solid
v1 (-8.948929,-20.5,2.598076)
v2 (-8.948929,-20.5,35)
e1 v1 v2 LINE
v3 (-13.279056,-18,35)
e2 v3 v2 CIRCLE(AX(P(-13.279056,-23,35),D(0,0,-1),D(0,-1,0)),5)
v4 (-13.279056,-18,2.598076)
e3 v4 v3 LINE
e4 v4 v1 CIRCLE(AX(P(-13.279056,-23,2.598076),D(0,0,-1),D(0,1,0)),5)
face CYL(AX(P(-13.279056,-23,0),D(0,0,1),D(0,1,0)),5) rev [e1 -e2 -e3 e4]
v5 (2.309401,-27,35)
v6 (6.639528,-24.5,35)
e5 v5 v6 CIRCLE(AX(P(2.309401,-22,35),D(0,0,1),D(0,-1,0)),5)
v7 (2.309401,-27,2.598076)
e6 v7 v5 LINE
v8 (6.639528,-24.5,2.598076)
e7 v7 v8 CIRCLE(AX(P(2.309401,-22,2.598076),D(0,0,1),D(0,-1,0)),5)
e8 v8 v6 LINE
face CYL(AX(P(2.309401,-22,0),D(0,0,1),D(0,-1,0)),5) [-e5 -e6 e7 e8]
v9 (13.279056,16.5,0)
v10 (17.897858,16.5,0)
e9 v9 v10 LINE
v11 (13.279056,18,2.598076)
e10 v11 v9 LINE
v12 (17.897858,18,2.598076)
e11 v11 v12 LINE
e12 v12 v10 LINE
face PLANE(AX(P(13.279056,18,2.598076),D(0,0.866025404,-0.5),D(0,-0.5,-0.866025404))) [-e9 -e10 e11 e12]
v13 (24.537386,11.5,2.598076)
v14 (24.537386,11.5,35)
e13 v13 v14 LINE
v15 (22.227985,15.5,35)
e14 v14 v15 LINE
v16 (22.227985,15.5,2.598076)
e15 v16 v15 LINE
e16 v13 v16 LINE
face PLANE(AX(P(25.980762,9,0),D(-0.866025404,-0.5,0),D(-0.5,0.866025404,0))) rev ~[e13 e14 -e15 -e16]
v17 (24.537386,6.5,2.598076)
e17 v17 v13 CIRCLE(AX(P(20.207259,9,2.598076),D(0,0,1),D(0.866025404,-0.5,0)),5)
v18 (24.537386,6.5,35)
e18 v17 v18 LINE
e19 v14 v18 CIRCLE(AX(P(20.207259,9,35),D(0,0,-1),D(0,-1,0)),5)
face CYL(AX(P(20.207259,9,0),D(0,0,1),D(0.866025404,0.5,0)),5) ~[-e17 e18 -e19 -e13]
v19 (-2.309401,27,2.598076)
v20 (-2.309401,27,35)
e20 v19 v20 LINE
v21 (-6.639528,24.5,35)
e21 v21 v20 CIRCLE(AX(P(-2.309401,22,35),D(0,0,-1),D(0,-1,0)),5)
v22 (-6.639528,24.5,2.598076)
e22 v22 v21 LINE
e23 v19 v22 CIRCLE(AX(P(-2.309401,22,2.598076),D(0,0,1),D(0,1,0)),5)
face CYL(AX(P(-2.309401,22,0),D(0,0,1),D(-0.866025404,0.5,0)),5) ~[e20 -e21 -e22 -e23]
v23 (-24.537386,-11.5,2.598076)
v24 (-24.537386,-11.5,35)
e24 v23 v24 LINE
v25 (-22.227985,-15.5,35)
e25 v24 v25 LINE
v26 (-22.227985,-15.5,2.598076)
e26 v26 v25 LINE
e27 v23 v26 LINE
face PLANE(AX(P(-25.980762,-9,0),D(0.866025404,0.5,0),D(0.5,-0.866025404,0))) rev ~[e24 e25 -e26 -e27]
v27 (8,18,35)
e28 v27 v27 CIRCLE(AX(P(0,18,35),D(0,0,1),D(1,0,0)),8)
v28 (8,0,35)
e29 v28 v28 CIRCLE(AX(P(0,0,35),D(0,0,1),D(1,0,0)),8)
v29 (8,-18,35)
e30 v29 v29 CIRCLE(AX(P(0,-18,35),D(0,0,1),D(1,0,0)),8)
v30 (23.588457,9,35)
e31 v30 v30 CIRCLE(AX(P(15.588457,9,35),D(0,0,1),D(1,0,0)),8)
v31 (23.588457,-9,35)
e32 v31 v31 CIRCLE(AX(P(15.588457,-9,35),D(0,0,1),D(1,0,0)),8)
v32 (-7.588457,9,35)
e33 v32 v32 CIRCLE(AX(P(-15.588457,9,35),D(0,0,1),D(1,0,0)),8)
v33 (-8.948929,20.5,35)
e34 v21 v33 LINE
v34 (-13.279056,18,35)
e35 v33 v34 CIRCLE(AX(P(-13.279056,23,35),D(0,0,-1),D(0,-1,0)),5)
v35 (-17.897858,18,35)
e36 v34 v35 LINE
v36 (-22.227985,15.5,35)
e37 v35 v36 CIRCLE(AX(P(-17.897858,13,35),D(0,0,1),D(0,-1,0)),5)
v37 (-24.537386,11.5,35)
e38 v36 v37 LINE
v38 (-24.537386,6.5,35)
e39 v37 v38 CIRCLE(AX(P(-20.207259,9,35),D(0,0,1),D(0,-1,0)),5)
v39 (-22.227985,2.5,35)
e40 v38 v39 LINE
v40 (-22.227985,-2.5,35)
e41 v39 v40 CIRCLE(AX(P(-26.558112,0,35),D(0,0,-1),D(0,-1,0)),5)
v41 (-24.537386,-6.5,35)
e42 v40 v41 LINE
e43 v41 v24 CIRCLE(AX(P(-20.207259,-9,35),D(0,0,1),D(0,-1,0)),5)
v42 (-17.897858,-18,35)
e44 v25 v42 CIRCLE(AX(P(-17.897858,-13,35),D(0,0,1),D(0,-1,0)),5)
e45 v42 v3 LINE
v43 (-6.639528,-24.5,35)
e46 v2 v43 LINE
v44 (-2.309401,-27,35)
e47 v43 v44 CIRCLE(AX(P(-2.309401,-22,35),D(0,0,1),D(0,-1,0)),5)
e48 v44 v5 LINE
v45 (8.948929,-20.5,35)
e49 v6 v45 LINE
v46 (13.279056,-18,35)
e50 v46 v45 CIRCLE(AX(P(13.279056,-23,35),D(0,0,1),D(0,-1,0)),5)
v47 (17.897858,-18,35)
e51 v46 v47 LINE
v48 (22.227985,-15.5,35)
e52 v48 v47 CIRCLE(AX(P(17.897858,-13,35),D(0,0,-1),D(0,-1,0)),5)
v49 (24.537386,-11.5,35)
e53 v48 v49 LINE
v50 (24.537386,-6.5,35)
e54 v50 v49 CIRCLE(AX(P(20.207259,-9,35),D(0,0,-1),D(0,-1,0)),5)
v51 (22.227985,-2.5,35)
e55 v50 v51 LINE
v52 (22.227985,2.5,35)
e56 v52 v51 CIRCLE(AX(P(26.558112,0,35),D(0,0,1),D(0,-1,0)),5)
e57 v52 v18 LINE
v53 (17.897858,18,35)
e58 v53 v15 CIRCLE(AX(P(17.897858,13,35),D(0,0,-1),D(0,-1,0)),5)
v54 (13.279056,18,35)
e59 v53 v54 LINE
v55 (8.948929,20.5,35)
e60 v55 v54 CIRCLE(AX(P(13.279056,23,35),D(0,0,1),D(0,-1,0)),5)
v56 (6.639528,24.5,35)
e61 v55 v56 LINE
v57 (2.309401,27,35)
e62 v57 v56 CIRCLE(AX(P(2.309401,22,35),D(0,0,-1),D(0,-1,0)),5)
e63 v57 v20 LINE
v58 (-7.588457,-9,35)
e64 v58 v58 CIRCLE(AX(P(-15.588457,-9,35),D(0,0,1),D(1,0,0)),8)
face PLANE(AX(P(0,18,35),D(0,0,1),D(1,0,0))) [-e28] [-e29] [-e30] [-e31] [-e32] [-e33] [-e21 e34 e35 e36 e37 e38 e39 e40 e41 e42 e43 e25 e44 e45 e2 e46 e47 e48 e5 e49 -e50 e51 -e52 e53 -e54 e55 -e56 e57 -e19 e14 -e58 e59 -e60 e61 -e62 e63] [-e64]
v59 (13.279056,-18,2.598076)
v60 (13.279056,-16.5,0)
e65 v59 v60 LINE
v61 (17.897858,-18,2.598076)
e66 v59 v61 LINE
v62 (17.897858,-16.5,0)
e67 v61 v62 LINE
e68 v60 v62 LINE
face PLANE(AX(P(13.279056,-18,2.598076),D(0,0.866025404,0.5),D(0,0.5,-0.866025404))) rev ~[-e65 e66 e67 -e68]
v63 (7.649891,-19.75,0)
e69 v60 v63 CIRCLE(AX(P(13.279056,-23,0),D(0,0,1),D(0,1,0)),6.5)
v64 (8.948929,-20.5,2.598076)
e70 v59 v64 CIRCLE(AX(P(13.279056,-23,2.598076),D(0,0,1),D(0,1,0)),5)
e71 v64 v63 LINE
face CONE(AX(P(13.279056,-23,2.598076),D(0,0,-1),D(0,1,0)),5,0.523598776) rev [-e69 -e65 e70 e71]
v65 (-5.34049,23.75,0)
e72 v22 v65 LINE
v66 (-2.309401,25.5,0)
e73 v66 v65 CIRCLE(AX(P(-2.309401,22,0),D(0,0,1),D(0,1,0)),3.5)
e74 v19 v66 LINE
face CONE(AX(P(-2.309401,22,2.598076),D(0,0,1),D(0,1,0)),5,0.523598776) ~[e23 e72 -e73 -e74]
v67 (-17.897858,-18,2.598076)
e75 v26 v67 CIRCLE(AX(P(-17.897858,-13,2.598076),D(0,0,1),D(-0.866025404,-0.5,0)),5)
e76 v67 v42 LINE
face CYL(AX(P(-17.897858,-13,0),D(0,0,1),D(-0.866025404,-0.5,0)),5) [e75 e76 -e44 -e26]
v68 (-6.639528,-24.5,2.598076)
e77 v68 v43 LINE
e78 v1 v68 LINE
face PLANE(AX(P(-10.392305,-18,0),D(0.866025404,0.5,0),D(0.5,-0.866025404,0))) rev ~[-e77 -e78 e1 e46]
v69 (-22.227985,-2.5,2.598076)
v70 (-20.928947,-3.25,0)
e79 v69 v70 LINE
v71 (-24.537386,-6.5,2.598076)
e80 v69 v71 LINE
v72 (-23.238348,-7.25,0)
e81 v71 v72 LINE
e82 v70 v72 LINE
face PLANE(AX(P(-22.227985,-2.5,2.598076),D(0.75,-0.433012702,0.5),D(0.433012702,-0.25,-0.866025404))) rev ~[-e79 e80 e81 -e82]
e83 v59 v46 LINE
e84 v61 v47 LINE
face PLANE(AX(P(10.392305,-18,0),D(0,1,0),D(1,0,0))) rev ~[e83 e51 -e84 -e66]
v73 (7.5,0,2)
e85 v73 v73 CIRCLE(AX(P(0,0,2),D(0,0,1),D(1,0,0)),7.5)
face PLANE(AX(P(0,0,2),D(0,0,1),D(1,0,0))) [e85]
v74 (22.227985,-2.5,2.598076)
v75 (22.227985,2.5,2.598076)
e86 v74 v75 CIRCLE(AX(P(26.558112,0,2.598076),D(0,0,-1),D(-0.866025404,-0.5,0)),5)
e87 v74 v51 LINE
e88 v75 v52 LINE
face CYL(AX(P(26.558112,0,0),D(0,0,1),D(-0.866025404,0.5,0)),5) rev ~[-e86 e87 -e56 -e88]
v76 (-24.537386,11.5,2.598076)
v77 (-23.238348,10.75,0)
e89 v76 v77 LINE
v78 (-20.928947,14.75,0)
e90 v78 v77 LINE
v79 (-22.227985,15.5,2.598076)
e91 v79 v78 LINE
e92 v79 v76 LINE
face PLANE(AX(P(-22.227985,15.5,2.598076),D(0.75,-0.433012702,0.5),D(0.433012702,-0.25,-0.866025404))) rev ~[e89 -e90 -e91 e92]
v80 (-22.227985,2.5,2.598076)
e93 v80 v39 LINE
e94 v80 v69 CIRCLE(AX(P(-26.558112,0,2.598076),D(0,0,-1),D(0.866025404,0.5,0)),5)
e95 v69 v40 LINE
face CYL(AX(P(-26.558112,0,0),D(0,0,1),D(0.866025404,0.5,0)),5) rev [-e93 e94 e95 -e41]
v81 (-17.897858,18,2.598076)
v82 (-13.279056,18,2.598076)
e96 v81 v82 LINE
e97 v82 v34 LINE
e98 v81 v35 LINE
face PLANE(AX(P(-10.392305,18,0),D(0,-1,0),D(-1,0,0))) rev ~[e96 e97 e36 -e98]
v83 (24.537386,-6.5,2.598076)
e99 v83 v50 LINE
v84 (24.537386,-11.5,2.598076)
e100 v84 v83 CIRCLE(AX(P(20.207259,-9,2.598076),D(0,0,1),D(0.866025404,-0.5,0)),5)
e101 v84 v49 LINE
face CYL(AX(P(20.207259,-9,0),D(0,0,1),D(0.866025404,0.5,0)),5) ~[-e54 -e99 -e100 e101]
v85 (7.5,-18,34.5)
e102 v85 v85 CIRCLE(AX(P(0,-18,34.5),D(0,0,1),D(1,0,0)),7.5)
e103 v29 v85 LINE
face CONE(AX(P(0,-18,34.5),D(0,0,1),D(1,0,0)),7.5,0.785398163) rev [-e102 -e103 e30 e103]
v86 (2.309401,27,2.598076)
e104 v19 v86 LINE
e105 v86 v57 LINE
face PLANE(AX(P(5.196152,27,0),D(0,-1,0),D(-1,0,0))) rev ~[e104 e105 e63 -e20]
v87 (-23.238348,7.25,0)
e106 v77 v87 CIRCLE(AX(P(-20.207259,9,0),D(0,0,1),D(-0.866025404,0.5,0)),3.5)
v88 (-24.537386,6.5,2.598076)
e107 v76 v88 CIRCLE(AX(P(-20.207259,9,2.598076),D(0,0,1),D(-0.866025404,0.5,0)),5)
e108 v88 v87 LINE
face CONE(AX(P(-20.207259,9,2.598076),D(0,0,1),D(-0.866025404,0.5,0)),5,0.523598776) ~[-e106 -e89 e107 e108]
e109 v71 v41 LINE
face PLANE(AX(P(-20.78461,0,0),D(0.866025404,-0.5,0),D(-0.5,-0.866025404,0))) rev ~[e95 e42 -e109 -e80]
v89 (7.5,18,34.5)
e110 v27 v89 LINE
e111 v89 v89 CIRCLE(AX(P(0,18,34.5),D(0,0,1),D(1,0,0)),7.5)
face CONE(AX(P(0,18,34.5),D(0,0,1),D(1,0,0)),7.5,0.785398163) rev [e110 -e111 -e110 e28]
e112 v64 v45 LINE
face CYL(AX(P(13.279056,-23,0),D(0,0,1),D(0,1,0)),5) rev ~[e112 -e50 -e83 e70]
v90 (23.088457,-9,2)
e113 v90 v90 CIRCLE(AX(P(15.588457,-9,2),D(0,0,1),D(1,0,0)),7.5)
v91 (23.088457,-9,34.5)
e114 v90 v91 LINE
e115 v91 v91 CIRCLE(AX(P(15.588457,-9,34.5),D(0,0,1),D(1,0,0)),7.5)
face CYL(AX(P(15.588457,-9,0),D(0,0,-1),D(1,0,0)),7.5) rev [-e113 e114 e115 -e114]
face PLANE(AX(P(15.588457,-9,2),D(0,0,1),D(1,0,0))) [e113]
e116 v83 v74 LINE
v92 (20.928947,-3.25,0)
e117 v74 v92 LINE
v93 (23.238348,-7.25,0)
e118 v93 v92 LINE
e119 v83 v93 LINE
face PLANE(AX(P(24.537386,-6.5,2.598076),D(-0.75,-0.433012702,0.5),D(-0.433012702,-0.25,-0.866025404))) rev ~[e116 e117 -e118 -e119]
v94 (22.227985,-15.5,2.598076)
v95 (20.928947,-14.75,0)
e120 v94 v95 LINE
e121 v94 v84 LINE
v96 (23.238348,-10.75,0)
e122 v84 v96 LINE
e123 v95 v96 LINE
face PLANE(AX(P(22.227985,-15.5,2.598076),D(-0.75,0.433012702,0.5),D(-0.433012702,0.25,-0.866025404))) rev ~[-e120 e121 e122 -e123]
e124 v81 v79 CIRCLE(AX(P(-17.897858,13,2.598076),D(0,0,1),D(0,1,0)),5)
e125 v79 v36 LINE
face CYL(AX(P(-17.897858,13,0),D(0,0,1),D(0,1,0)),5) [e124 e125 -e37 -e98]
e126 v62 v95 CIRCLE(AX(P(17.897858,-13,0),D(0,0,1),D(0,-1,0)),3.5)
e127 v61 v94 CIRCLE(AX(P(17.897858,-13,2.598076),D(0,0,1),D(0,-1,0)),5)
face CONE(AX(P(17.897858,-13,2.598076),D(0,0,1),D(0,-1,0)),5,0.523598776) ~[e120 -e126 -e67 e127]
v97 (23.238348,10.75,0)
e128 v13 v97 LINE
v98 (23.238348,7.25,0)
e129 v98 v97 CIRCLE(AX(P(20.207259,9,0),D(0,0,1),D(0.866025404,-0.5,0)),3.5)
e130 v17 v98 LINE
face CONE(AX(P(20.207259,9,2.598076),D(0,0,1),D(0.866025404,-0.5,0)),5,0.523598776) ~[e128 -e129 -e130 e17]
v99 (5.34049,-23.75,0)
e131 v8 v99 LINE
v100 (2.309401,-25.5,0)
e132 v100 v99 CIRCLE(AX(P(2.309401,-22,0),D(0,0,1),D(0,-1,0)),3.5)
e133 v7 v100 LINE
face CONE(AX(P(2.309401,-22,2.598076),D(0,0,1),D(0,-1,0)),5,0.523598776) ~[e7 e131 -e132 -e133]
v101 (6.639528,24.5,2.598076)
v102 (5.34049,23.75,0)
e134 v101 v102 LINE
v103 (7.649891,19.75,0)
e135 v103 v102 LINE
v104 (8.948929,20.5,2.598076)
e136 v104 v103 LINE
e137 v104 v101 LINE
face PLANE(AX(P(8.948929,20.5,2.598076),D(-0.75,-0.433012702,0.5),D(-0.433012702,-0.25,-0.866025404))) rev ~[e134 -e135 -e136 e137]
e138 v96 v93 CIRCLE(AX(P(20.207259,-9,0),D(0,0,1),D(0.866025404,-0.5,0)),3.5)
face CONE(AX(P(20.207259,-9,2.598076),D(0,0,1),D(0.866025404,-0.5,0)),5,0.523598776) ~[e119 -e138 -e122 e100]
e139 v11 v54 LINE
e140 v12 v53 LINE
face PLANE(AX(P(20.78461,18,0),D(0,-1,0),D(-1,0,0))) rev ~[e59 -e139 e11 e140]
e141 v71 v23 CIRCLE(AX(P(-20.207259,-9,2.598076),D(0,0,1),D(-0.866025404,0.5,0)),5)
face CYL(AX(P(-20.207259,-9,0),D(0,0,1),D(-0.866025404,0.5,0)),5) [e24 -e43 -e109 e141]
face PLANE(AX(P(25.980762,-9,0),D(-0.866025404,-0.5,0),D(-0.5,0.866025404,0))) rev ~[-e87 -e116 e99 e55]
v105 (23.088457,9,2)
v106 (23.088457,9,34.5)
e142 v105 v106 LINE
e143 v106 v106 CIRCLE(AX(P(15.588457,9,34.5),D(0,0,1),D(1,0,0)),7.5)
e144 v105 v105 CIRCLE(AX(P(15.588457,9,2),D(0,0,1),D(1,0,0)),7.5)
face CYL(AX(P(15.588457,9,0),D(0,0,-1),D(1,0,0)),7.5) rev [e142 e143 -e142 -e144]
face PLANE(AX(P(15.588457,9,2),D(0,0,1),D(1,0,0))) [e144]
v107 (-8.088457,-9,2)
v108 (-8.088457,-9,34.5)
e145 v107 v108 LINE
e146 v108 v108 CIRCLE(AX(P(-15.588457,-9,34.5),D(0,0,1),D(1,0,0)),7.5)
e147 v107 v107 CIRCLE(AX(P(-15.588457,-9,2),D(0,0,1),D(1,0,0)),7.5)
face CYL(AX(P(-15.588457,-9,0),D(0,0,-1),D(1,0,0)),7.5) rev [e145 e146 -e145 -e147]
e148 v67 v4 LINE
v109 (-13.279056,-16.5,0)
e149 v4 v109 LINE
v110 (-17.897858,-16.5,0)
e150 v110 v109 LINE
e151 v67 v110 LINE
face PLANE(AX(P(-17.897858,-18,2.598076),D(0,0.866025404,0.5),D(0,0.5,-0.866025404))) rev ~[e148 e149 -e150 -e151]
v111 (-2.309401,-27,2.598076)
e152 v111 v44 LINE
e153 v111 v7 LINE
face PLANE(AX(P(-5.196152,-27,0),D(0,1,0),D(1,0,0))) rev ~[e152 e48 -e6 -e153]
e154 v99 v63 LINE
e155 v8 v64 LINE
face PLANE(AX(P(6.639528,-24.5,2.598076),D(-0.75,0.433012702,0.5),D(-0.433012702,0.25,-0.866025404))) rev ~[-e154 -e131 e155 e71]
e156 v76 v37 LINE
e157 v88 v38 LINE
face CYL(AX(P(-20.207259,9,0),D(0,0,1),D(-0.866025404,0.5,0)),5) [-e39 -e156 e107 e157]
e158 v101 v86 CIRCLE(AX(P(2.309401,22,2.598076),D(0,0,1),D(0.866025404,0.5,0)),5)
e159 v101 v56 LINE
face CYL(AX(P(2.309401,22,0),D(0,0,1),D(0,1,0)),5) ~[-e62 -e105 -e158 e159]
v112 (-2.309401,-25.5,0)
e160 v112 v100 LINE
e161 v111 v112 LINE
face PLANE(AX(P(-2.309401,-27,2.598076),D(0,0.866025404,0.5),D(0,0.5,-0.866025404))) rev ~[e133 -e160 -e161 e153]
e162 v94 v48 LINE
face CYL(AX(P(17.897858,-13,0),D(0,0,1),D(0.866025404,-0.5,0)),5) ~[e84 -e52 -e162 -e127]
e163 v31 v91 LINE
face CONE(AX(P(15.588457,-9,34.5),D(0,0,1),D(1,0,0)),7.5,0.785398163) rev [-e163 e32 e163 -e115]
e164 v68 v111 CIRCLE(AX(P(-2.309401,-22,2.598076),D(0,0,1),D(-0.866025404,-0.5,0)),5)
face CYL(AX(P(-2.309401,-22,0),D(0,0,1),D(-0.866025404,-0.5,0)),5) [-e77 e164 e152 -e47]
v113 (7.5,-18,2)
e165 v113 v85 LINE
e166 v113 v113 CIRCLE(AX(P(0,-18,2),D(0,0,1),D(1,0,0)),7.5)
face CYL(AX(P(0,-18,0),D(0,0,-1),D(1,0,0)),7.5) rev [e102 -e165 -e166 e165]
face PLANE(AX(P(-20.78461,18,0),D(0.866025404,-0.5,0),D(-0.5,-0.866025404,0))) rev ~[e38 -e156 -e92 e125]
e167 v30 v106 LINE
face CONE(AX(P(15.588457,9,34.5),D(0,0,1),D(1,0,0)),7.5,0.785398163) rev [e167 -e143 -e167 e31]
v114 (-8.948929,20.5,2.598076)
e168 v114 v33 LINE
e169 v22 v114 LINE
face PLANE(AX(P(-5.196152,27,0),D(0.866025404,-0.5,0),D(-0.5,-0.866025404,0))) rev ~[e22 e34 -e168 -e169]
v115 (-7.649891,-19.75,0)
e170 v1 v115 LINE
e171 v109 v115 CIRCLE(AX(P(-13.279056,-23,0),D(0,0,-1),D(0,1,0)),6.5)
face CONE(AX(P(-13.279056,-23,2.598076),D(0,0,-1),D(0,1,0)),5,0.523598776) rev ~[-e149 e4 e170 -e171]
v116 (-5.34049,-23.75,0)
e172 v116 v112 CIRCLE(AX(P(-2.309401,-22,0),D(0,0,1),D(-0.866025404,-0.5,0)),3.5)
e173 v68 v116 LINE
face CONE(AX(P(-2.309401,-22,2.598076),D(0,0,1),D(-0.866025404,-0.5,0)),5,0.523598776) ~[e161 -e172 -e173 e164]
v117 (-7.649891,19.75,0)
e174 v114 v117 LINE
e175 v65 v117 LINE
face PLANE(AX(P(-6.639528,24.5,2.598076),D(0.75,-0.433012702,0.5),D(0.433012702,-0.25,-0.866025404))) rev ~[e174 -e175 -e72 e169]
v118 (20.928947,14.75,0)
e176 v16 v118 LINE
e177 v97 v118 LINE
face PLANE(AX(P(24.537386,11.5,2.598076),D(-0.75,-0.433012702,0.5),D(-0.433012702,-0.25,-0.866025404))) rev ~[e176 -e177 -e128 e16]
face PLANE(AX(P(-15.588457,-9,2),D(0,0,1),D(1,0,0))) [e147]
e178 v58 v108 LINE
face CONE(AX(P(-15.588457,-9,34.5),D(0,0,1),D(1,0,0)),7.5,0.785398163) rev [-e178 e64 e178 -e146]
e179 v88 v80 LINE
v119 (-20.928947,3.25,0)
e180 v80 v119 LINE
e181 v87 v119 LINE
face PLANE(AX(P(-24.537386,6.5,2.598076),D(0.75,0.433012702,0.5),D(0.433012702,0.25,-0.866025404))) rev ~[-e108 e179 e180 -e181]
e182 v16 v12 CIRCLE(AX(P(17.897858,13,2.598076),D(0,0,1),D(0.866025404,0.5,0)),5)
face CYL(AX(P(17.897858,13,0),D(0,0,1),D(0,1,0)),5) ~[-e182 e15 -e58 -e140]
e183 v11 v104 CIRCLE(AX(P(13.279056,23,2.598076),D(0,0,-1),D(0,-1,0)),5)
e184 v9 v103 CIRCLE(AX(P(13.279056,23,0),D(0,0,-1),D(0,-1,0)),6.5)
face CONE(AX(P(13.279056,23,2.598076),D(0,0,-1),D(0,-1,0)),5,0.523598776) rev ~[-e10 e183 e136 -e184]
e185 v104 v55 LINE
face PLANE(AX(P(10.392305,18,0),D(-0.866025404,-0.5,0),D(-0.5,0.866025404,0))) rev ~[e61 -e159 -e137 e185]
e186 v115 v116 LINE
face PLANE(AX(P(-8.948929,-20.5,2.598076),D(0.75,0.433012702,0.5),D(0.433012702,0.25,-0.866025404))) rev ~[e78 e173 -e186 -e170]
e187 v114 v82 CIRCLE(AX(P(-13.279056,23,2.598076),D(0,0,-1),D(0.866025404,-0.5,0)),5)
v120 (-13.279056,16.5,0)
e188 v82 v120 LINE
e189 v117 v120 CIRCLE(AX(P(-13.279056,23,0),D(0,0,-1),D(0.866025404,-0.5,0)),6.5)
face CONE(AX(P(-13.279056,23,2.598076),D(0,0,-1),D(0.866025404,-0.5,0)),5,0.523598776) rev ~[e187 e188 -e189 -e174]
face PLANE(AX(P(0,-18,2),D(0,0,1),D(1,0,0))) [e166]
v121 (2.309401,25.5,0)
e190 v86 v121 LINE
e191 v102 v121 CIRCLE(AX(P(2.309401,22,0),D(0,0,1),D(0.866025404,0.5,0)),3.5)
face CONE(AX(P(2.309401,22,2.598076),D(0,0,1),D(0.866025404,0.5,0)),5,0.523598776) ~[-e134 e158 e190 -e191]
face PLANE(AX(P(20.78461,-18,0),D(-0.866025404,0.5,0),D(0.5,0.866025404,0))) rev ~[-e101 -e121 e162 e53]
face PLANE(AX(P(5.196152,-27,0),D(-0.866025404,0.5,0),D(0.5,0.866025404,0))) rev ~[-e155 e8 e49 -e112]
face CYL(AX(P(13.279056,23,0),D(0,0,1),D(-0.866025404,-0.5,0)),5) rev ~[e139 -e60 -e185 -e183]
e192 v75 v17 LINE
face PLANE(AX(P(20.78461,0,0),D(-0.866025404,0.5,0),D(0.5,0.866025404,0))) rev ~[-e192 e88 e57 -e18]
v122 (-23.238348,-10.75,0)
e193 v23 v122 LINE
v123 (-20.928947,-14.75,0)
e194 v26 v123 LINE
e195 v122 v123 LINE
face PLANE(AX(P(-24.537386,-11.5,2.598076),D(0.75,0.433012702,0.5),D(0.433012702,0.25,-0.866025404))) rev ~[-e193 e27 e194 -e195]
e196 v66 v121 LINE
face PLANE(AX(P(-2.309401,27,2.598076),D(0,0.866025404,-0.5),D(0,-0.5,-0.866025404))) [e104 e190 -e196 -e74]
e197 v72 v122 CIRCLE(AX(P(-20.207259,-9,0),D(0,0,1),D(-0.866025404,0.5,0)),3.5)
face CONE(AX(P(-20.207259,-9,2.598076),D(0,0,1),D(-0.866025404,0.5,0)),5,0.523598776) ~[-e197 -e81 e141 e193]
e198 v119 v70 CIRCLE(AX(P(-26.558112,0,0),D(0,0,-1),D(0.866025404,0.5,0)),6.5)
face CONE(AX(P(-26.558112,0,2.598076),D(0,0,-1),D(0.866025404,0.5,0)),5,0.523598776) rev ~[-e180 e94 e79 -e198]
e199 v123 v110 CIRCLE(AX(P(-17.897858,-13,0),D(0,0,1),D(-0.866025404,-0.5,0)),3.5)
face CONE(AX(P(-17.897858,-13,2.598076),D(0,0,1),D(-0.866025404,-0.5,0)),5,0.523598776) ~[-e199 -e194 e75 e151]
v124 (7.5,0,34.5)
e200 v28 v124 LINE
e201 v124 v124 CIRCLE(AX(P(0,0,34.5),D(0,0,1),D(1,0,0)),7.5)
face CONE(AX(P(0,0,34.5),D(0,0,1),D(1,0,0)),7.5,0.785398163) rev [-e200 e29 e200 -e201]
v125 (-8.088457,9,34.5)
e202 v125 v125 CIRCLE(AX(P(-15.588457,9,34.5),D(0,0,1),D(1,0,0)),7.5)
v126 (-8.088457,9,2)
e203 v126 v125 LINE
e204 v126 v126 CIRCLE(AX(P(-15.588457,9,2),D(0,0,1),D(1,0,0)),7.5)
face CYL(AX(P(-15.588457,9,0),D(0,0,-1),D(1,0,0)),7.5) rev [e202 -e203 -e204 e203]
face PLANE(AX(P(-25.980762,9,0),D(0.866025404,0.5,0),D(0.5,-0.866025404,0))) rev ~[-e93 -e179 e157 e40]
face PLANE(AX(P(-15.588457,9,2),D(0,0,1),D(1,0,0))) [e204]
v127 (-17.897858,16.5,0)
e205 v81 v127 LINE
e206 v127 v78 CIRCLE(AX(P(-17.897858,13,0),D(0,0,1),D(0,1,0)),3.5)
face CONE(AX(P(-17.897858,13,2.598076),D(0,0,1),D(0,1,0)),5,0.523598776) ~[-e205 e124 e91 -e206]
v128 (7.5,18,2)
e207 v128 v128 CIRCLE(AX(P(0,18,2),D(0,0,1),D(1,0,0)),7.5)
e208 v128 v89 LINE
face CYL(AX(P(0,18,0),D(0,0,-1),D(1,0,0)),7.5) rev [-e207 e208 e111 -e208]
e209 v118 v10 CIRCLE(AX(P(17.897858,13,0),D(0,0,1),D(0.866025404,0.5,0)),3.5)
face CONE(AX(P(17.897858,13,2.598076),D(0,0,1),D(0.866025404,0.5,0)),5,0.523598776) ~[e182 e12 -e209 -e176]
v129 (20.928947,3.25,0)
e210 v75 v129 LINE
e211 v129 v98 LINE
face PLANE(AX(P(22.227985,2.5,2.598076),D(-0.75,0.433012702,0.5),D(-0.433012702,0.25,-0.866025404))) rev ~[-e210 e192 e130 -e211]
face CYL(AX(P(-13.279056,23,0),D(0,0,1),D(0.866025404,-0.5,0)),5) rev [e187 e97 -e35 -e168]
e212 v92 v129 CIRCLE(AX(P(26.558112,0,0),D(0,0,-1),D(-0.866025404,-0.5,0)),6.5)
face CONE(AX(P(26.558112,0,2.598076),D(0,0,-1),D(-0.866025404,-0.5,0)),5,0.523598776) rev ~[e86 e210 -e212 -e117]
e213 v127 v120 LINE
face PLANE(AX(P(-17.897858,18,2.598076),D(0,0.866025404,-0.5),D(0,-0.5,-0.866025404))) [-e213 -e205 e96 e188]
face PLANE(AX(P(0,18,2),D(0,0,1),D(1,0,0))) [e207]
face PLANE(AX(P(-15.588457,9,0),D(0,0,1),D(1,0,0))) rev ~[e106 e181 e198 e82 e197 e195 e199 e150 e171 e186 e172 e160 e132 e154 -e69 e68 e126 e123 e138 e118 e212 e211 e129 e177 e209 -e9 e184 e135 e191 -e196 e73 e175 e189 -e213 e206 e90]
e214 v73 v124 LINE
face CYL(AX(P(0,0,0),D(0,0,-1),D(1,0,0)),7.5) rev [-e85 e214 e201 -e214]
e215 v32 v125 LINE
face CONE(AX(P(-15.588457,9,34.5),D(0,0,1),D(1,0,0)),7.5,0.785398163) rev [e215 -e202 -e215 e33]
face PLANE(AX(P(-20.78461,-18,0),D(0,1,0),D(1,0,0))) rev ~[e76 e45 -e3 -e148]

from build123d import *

# Parameters (mm, degrees)
F0_R         = 7.5
F1_DEPTH     = 35
F2_DEPTH     = 2
F3_SIZE      = 0.5
F4_R         = 5
F5_T1_DEPTH  = 4.6188021535
F5_T3_DEPTH  = 4.6188021535
F5_T5_DEPTH  = 4.6188021535
F5_T7_DEPTH  = 4.6188021535
F5_T9_DEPTH  = 4.6188021535
F5_T11_DEPTH = 4.6188021535
F5_T13_DEPTH = 4.6188021535
F5_T15_DEPTH = 4.6188021535
F5_T17_DEPTH = 4.6188021535
F5_T19_DEPTH = 4.6188021535
F5_T21_DEPTH = 4.6188021535
F5_T23_DEPTH = 4.6188021535
F5_T25_DEPTH = 4.6188021535
F5_T27_DEPTH = 4.6188021535
F5_T29_DEPTH = 4.6188021535
F5_T32_ANGLE = 60
F5_T34_ANGLE = 60
F5_T36_ANGLE = 60
F5_T38_ANGLE = 60
F5_T40_ANGLE = 60
F5_T42_ANGLE = 60
F5_T44_ANGLE = 60
F5_T46_ANGLE = 60
F5_T48_ANGLE = 60
F5_T50_ANGLE = 60
F5_T52_ANGLE = 60
F5_T54_ANGLE = 60
F5_T56_ANGLE = 60
F5_T58_ANGLE = 60
F5_T60_ANGLE = 60
F5_T62_ANGLE = 60
F5_T64_ANGLE = 60
F5_T66_ANGLE = 60


# Not quite as in the source:
# - a fillet or chamfer that OpenCascade refuses, or shapes differently, is made with other operations: its cross-section is extruded or revolved along the edge and cut away or added


with BuildPart() as f1:
    # F0 (on Top) → F1 (new body)
    with BuildSketch(Plane.XY):
        Polygon((-10.3923048454, 18), (-5.1961524227, 9), (5.1961524227, 9), (10.3923048454, 18), (5.1961524227, 27), (-5.1961524227, 27), align=None)
        with Locations((0, 18)):
            Circle(F0_R, mode=Mode.SUBTRACT)
        Polygon((5.1961524227, 9), (-5.1961524227, 9), (-10.3923048454, 0), (-5.1961524227, -9), (5.1961524227, -9), (10.3923048454, 0), align=None)
        Circle(F0_R, mode=Mode.SUBTRACT)
        Polygon((-10.3923048454, 0), (-5.1961524227, 9), (-10.3923048454, 18), (-20.7846096908, 18), (-25.9807621135, 9), (-20.7846096908, 0), align=None)
        with Locations((-15.5884572681, 9)):
            Circle(F0_R, mode=Mode.SUBTRACT)
        Polygon((10.3923048454, 18), (5.1961524227, 9), (10.3923048454, 0), (20.7846096908, 0), (25.9807621135, 9), (20.7846096908, 18), align=None)
        with Locations((15.5884572681, 9)):
            Circle(F0_R, mode=Mode.SUBTRACT)
        Polygon((-5.1961524227, -9), (-10.3923048454, 0), (-20.7846096908, 0), (-25.9807621135, -9), (-20.7846096908, -18), (-10.3923048454, -18), align=None)
        with Locations((-15.5884572681, -9)):
            Circle(F0_R, mode=Mode.SUBTRACT)
        Polygon((20.7846096908, 0), (10.3923048454, 0), (5.1961524227, -9), (10.3923048454, -18), (20.7846096908, -18), (25.9807621135, -9), align=None)
        with Locations((15.5884572681, -9)):
            Circle(F0_R, mode=Mode.SUBTRACT)
        Polygon((5.1961524227, -9), (-5.1961524227, -9), (-10.3923048454, -18), (-5.1961524227, -27), (5.1961524227, -27), (10.3923048454, -18), align=None)
        with Locations((0, -18)):
            Circle(F0_R, mode=Mode.SUBTRACT)
    extrude(amount=F1_DEPTH)

    # F0 (on Top) → F2 (join)
    with BuildSketch(Plane.XY):
        with Locations((-15.5884572681, 9)):
            Circle(F0_R)
        with Locations((-15.5884572681, -9)):
            Circle(F0_R)
        with Locations((0, 18)):
            Circle(F0_R)
        Circle(F0_R)
        with Locations((15.5884572681, 9)):
            Circle(F0_R)
        with Locations((15.5884572681, -9)):
            Circle(F0_R)
        with Locations((0, -18)):
            Circle(F0_R)
    extrude(amount=F2_DEPTH)

    # F3
    f3_edges = [f1.edges().sort_by_distance(p)[0] for p in [
        (-7.5, 18, 35),
        (-23.088457, 9, 35),
        (-7.5, 0, 35),
        (-23.088457, -9, 35),
        (8.088457, 9, 35),
        (8.088457, -9, 35),
        (-7.5, -18, 35),
    ]]
    chamfer(f3_edges, length=F3_SIZE)

    # F4
    f4_edges = [f1.edges().sort_by_distance(p)[0] for p in [
        (-25.980762, 9, 17.5),
        (-20.78461, 18, 17.5),
        (-10.392305, 18, 17.5),
        (-5.196152, 27, 17.5),
        (5.196152, 27, 17.5),
        (10.392305, 18, 17.5),
        (20.78461, 18, 17.5),
        (25.980762, 9, 17.5),
        (20.78461, 0, 17.5),
        (25.980762, -9, 17.5),
        (20.78461, -18, 17.5),
        (10.392305, -18, 17.5),
        (5.196152, -27, 17.5),
        (-5.196152, -27, 17.5),
        (-10.392305, -18, 17.5),
        (-20.78461, -18, 17.5),
        (-25.980762, -9, 17.5),
        (-20.78461, 0, 17.5),
    ]]
    fillet(f4_edges, radius=F4_R)

    # F5: chamfer of 1.5 x 2.5980762114 on 36 edges, made by hand

    # F5_s2 → F5_t1 (cut)
    with BuildSketch(Plane.YZ.offset(13.2790561914)):
        Polygon((-18, 2.5980762114), (-16.5, 0), (-18, 0), align=None)
        Polygon((18, 2.5980762114), (16.5, 0), (18, 0), align=None)
    extrude(amount=F5_T1_DEPTH, mode=Mode.SUBTRACT)

    # F5_s4 → F5_t3 (cut)
    with BuildSketch(Plane(origin=(-8.9489291724, -15.5, 0), x_dir=(0, 0, 1), z_dir=(0.5, 0.8660254038, 0))):
        Polygon((2.5980762114, 18), (0, 16.5), (0, 18), align=None)
    extrude(amount=F5_T3_DEPTH, mode=Mode.SUBTRACT)

    # F5_s6 → F5_t5 (cut)
    with BuildSketch(Plane(origin=(-1.1547005384, -2, 0), x_dir=(0, 0, 1), z_dir=(0.5, 0.8660254038, 0))):
        Polygon((2.5980762114, 27), (0, 25.5), (0, 27), align=None)
    extrude(amount=F5_T5_DEPTH, mode=Mode.SUBTRACT)

    # F5_s8 → F5_t7 (cut)
    with BuildSketch(Plane.YZ.offset(-2.3094010768)):
        Polygon((-27, 2.5980762114), (-25.5, 0), (-27, 0), align=None)
        Polygon((27, 2.5980762114), (25.5, 0), (27, 0), align=None)
    extrude(amount=F5_T7_DEPTH, mode=Mode.SUBTRACT)

    # F5_s10 → F5_t9 (cut)
    with BuildSketch(Plane(origin=(8.9489291724, -15.5, 0), x_dir=(0, 0, 1), z_dir=(-0.5, 0.8660254038, 0))):
        Polygon((2.5980762114, 18), (0, 16.5), (0, 18), align=None)
    extrude(amount=F5_T9_DEPTH, mode=Mode.SUBTRACT)

    # F5_s12 → F5_t11 (cut)
    with BuildSketch(Plane(origin=(6.6395280957, -11.5, 0), x_dir=(0, 0, 1), z_dir=(0.5, -0.8660254038, 0))):
        Polygon((2.5980762114, 18), (0, 16.5), (0, 18), align=None)
    extrude(amount=F5_T11_DEPTH, mode=Mode.SUBTRACT)

    # F5_s14 → F5_t13 (cut)
    with BuildSketch(Plane(origin=(6.6395280957, 11.5, 0), x_dir=(0, 0, 1), z_dir=(0.5, 0.8660254038, 0))):
        Polygon((2.5980762114, 18), (0, 16.5), (0, 18), align=None)
    extrude(amount=F5_T13_DEPTH, mode=Mode.SUBTRACT)

    # F5_s16 → F5_t15 (cut)
    with BuildSketch(Plane.YZ.offset(-17.8978583449)):
        Polygon((-18, 2.5980762114), (-16.5, 0), (-18, 0), align=None)
        Polygon((18, 2.5980762114), (16.5, 0), (18, 0), align=None)
    extrude(amount=F5_T15_DEPTH, mode=Mode.SUBTRACT)

    # F5_s18 → F5_t17 (cut)
    with BuildSketch(Plane(origin=(1.1547005384, -2, 0), x_dir=(0, 0, 1), z_dir=(-0.5, 0.8660254038, 0))):
        Polygon((2.5980762114, 27), (0, 25.5), (0, 27), align=None)
    extrude(amount=F5_T17_DEPTH, mode=Mode.SUBTRACT)

    # F5_s20 → F5_t19 (cut)
    with BuildSketch(Plane(origin=(-1.1547005384, 2, 0), x_dir=(0, 0, 1), z_dir=(0.5, -0.8660254038, 0))):
        Polygon((2.5980762114, 27), (0, 25.5), (0, 27), align=None)
    extrude(amount=F5_T19_DEPTH, mode=Mode.SUBTRACT)

    # F5_s22 → F5_t21 (cut)
    with BuildSketch(Plane(origin=(-6.6395280957, -11.5, 0), x_dir=(0, 0, 1), z_dir=(-0.5, -0.8660254038, 0))):
        Polygon((2.5980762114, 18), (0, 16.5), (0, 18), align=None)
    extrude(amount=F5_T21_DEPTH, mode=Mode.SUBTRACT)

    # F5_s24 → F5_t23 (cut)
    with BuildSketch(Plane(origin=(-6.6395280957, 11.5, 0), x_dir=(0, 0, 1), z_dir=(-0.5, 0.8660254038, 0))):
        Polygon((2.5980762114, 18), (0, 16.5), (0, 18), align=None)
    extrude(amount=F5_T23_DEPTH, mode=Mode.SUBTRACT)

    # F5_s26 → F5_t25 (cut)
    with BuildSketch(Plane(origin=(-8.9489291724, 15.5, 0), x_dir=(0, 0, 1), z_dir=(0.5, -0.8660254038, 0))):
        Polygon((2.5980762114, 18), (0, 16.5), (0, 18), align=None)
    extrude(amount=F5_T25_DEPTH, mode=Mode.SUBTRACT)

    # F5_s28 → F5_t27 (cut)
    with BuildSketch(Plane(origin=(1.1547005384, 2, 0), x_dir=(0, 0, 1), z_dir=(-0.5, -0.8660254038, 0))):
        Polygon((2.5980762114, 27), (0, 25.5), (0, 27), align=None)
    extrude(amount=F5_T27_DEPTH, mode=Mode.SUBTRACT)

    # F5_s30 → F5_t29 (cut)
    with BuildSketch(Plane(origin=(8.9489291724, 15.5, 0), x_dir=(0, 0, 1), z_dir=(-0.5, -0.8660254038, 0))):
        Polygon((2.5980762114, 18), (0, 16.5), (0, 18), align=None)
    extrude(amount=F5_T29_DEPTH, mode=Mode.SUBTRACT)

    # F5_s31 → F5_t32 (revolve, cut)
    with BuildSketch(Plane.YZ.offset(13.2790561914)):
        Polygon((-18, 2.5980762114), (-16.5, 0), (-18, 0), align=None)
    revolve(axis=Axis((13.2790561914, -23, 0), (0, 0, 1)), revolution_arc=F5_T32_ANGLE, mode=Mode.SUBTRACT)

    # F5_s33 → F5_t34 (revolve, cut)
    with BuildSketch(Plane.YZ.offset(17.8978583449)):
        Polygon((-18, 2.5980762114), (-16.5, 0), (-18, 0), align=None)
    revolve(axis=Axis((17.8978583449, -13, 0), (0, 0, 1)), revolution_arc=F5_T34_ANGLE, mode=Mode.SUBTRACT)

    # F5_s35 → F5_t36 (revolve, cut)
    with BuildSketch(Plane.YZ.offset(2.3094010768)):
        Polygon((-27, 2.5980762114), (-25.5, 0), (-27, 0), align=None)
    revolve(axis=Axis((2.3094010768, -22, 0), (0, 0, 1)), revolution_arc=F5_T36_ANGLE, mode=Mode.SUBTRACT)

    # F5_s37 → F5_t38 (revolve, cut)
    with BuildSketch(Plane(origin=(1.1547005384, 2, 0), x_dir=(0, 0, 1), z_dir=(-0.5, -0.8660254038, 0))):
        Polygon((2.5980762114, -27), (0, -25.5), (0, -27), align=None)
    revolve(axis=Axis((20.2072594216, -9, 0), (0, 0, 1)), revolution_arc=F5_T38_ANGLE, mode=Mode.SUBTRACT)

    # F5_s39 → F5_t40 (revolve, cut)
    with BuildSketch(Plane(origin=(8.9489291724, -15.5, 0), x_dir=(0, 0, 1), z_dir=(-0.5, 0.8660254038, 0))):
        Polygon((2.5980762114, -18), (0, -16.5), (0, -18), align=None)
    revolve(axis=Axis((-2.3094010768, -22, 0), (0, 0, 1)), revolution_arc=F5_T40_ANGLE, mode=Mode.SUBTRACT)

    # F5_s41 → F5_t42 (revolve, cut)
    with BuildSketch(Plane(origin=(6.6395280957, -11.5, 0), x_dir=(0, 0, 1), z_dir=(0.5, -0.8660254038, 0))):
        Polygon((2.5980762114, -18), (0, -16.5), (0, -18), align=None)
    revolve(axis=Axis((26.5581123827, 0, 0), (0, 0, -1)), revolution_arc=F5_T42_ANGLE, mode=Mode.SUBTRACT)

    # F5_s43 → F5_t44 (revolve, cut)
    with BuildSketch(Plane.YZ.offset(-13.2790561914)):
        Polygon((-18, 2.5980762114), (-16.5, 0), (-18, 0), align=None)
    revolve(axis=Axis((-13.2790561914, -23, 0), (0, 0, -1)), revolution_arc=F5_T44_ANGLE, mode=Mode.SUBTRACT)

    # F5_s45 → F5_t46 (revolve, cut)
    with BuildSketch(Plane(origin=(8.9489291724, 15.5, 0), x_dir=(0, 0, 1), z_dir=(-0.5, -0.8660254038, 0))):
        Polygon((2.5980762114, -18), (0, -16.5), (0, -18), align=None)
    revolve(axis=Axis((20.2072594216, 9, 0), (0, 0, 1)), revolution_arc=F5_T46_ANGLE, mode=Mode.SUBTRACT)

    # F5_s47 → F5_t48 (revolve, cut)
    with BuildSketch(Plane(origin=(1.1547005384, -2, 0), x_dir=(0, 0, 1), z_dir=(-0.5, 0.8660254038, 0))):
        Polygon((2.5980762114, -27), (0, -25.5), (0, -27), align=None)
    revolve(axis=Axis((-17.8978583449, -13, 0), (0, 0, 1)), revolution_arc=F5_T48_ANGLE, mode=Mode.SUBTRACT)

    # F5_s49 → F5_t50 (revolve, cut)
    with BuildSketch(Plane(origin=(-1.1547005384, 2, 0), x_dir=(0, 0, 1), z_dir=(0.5, -0.8660254038, 0))):
        Polygon((2.5980762114, -27), (0, -25.5), (0, -27), align=None)
    revolve(axis=Axis((17.8978583449, 13, 0), (0, 0, 1)), revolution_arc=F5_T50_ANGLE, mode=Mode.SUBTRACT)

    # F5_s51 → F5_t52 (revolve, cut)
    with BuildSketch(Plane(origin=(-8.9489291724, -15.5, 0), x_dir=(0, 0, 1), z_dir=(0.5, 0.8660254038, 0))):
        Polygon((2.5980762114, -18), (0, -16.5), (0, -18), align=None)
    revolve(axis=Axis((-20.2072594216, -9, 0), (0, 0, 1)), revolution_arc=F5_T52_ANGLE, mode=Mode.SUBTRACT)

    # F5_s53 → F5_t54 (revolve, cut)
    with BuildSketch(Plane.YZ.offset(13.2790561914)):
        Polygon((18, 2.5980762114), (16.5, 0), (18, 0), align=None)
    revolve(axis=Axis((13.2790561914, 23, 0), (0, 0, -1)), revolution_arc=F5_T54_ANGLE, mode=Mode.SUBTRACT)

    # F5_s55 → F5_t56 (revolve, cut)
    with BuildSketch(Plane(origin=(-6.6395280957, 11.5, 0), x_dir=(0, 0, 1), z_dir=(-0.5, 0.8660254038, 0))):
        Polygon((2.5980762114, -18), (0, -16.5), (0, -18), align=None)
    revolve(axis=Axis((-26.5581123827, 0, 0), (0, 0, -1)), revolution_arc=F5_T56_ANGLE, mode=Mode.SUBTRACT)

    # F5_s57 → F5_t58 (revolve, cut)
    with BuildSketch(Plane(origin=(-8.9489291724, 15.5, 0), x_dir=(0, 0, 1), z_dir=(0.5, -0.8660254038, 0))):
        Polygon((2.5980762114, -18), (0, -16.5), (0, -18), align=None)
    revolve(axis=Axis((2.3094010768, 22, 0), (0, 0, 1)), revolution_arc=F5_T58_ANGLE, mode=Mode.SUBTRACT)

    # F5_s59 → F5_t60 (revolve, cut)
    with BuildSketch(Plane(origin=(-1.1547005384, -2, 0), x_dir=(0, 0, 1), z_dir=(0.5, 0.8660254038, 0))):
        Polygon((2.5980762114, -27), (0, -25.5), (0, -27), align=None)
    revolve(axis=Axis((-20.2072594216, 9, 0), (0, 0, 1)), revolution_arc=F5_T60_ANGLE, mode=Mode.SUBTRACT)

    # F5_s61 → F5_t62 (revolve, cut)
    with BuildSketch(Plane.YZ.offset(-2.3094010768)):
        Polygon((27, 2.5980762114), (25.5, 0), (27, 0), align=None)
    revolve(axis=Axis((-2.3094010768, 22, 0), (0, 0, 1)), revolution_arc=F5_T62_ANGLE, mode=Mode.SUBTRACT)

    # F5_s63 → F5_t64 (revolve, cut)
    with BuildSketch(Plane.YZ.offset(-17.8978583449)):
        Polygon((18, 2.5980762114), (16.5, 0), (18, 0), align=None)
    revolve(axis=Axis((-17.8978583449, 13, 0), (0, 0, 1)), revolution_arc=F5_T64_ANGLE, mode=Mode.SUBTRACT)

    # F5_s65 → F5_t66 (revolve, cut)
    with BuildSketch(Plane(origin=(6.6395280957, 11.5, 0), x_dir=(0, 0, 1), z_dir=(0.5, 0.8660254038, 0))):
        Polygon((2.5980762114, -18), (0, -16.5), (0, -18), align=None)
    revolve(axis=Axis((-13.2790561914, 23, 0), (0, 0, -1)), revolution_arc=F5_T66_ANGLE, mode=Mode.SUBTRACT)


solid = f1.part
